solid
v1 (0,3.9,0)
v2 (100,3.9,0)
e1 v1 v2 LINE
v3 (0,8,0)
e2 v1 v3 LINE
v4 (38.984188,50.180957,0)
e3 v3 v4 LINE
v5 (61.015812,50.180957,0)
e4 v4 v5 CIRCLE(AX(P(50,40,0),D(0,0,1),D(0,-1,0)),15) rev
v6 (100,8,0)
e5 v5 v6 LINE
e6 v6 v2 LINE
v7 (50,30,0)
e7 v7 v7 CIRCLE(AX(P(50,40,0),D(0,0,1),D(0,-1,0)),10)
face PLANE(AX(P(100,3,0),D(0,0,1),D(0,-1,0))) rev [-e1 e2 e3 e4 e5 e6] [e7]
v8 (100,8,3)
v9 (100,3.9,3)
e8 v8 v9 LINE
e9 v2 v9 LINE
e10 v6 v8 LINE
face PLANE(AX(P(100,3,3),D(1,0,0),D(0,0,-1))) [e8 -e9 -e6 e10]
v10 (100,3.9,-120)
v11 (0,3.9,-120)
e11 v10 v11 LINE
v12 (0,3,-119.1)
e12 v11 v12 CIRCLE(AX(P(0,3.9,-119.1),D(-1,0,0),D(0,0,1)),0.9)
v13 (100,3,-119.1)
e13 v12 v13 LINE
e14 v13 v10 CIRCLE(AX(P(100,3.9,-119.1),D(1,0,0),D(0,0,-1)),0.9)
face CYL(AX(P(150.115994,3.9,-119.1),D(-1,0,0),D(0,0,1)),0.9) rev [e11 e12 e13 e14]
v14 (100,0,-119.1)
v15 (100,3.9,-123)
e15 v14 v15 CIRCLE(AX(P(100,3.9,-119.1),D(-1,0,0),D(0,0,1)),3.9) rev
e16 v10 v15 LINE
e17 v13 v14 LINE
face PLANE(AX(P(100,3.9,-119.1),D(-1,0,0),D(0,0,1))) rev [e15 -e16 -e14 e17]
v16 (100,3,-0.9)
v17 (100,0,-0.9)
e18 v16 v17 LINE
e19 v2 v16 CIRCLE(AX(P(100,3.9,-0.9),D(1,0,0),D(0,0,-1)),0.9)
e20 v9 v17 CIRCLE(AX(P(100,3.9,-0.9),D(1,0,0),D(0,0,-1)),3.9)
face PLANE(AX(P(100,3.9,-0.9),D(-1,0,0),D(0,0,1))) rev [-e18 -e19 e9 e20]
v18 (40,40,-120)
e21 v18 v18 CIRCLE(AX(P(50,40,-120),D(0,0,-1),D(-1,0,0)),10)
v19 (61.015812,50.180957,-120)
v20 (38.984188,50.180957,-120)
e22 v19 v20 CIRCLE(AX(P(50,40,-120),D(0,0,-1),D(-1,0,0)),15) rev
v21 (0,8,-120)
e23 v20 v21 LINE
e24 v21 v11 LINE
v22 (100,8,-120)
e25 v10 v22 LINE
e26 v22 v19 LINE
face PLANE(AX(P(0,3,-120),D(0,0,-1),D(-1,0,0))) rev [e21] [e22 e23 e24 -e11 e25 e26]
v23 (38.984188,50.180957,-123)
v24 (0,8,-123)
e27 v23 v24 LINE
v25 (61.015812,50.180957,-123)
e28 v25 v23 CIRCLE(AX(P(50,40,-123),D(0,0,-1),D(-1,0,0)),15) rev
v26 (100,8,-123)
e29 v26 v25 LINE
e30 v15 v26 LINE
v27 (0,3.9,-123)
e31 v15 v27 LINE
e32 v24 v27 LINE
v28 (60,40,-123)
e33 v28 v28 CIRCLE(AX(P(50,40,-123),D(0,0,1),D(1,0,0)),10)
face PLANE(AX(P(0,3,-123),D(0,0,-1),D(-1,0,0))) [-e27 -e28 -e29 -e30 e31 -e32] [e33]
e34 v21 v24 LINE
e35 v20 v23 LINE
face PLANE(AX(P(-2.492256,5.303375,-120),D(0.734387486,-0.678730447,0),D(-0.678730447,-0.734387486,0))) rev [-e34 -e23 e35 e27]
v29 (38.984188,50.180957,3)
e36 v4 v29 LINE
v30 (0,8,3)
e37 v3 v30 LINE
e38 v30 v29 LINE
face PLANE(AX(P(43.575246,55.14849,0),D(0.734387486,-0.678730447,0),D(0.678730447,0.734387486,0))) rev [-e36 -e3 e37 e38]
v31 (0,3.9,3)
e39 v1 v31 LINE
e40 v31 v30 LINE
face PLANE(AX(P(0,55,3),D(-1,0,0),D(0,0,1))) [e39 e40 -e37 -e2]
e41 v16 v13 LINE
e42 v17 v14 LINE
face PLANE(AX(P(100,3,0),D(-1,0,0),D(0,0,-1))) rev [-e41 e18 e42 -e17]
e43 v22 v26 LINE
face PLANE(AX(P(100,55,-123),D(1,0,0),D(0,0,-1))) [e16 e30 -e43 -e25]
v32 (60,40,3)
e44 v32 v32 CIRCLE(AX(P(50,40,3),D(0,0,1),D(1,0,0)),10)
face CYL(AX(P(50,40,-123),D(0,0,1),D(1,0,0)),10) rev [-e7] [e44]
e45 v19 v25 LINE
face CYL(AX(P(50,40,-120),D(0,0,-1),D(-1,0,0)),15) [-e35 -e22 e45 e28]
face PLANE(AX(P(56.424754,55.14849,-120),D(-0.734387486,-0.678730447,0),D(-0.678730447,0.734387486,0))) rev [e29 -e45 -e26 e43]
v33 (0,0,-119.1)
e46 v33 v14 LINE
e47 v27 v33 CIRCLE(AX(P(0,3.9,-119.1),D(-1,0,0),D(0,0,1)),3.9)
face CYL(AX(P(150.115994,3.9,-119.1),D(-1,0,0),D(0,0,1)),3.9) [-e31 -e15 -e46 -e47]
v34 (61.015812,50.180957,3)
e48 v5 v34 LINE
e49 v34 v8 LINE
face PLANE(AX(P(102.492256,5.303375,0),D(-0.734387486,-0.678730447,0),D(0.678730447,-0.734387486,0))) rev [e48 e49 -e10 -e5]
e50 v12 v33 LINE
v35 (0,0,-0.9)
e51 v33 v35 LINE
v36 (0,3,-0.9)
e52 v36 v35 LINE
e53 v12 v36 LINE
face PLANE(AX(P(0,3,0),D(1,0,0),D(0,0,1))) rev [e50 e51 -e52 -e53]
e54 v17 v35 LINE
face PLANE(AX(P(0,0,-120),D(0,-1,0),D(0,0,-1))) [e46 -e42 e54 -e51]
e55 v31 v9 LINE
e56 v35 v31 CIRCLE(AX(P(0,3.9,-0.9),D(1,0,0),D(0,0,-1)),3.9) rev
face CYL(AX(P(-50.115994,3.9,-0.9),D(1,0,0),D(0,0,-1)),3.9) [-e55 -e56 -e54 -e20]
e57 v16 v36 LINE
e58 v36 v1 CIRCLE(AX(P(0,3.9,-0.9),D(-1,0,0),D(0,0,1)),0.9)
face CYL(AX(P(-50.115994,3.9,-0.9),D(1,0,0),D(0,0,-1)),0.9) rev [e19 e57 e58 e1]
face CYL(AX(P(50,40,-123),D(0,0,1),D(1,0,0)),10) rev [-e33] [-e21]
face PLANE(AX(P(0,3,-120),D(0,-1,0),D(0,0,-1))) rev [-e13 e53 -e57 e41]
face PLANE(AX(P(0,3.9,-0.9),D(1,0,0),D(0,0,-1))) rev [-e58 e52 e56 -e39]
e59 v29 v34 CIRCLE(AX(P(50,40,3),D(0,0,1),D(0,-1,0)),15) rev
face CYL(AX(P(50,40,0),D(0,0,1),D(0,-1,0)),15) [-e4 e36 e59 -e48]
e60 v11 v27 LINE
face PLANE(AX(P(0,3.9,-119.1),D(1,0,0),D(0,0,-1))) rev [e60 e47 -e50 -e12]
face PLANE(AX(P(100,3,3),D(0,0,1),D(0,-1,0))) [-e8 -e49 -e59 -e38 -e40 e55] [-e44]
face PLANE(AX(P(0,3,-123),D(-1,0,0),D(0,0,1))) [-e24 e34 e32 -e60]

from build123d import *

# Parameters (mm, degrees)
ESBO_O1_W                      = 100
ESBO_O1_H                      = 120
RESSALTO_EXTRUS_O1_DEPTH       = 3
ARESTA_FLANGE1_STRIP_W         = 13.8
ARESTA_FLANGE1_STRIP_H         = 3
ARESTA_FLANGE1_STRIP_CUT_DEPTH = 100
ARESTA_FLANGE1_DEPTH           = 100
ARESTA_FLANGE2_STRIP_W         = 13.8
ARESTA_FLANGE2_STRIP_H         = 3
ARESTA_FLANGE2_STRIP_CUT_DEPTH = 100
ARESTA_FLANGE2_DEPTH           = 100
CORTE_EXTRUS_O1_DEPTH          = 171.002941151
ESBO_O13_R                     = 10
CORTE_EXTRUS_O2_DEPTH          = 171.002941151
DESDOBRAR1_START               = 3
DESDOBRAR1_OUTLINE_W           = 100
DESDOBRAR1_OUTLINE_H           = 126
DESDOBRAR1_DEPTH               = 53
DESDOBRAR1_2_OUTLINE_R         = 10
DESDOBRAR1_2_DEPTH             = 3
DOBRAR1_START                  = -175
DOBRAR1_OUTLINE_W              = 100
DOBRAR1_OUTLINE_H              = 3
DOBRAR1_DEPTH                  = 52
DOBRAR1_START_2                = 3
DOBRAR1_2_OUTLINE_W            = 100
DOBRAR1_2_OUTLINE_H            = 3
DOBRAR1_2_DEPTH                = 52
DOBRAR1_START_3                = -123
DOBRAR1_3_OUTLINE_R            = 10
DOBRAR1_3_DEPTH                = 3.9
DOBRAR1_START_4                = -0.9
DOBRAR1_4_OUTLINE_R            = 10
DOBRAR1_4_DEPTH                = 3.9
DOBRAR1_START_5                = -1
DOBRAR1_5_DEPTH                = 102


with BuildPart() as part:
    # Esboço1 → Ressalto-extrusão1 (new body)
    with BuildSketch(Plane(origin=(0, 0, 0), x_dir=(1, 0, 0), z_dir=(0, 1, 0))):
        with Locations((50, 60)):
            Rectangle(ESBO_O1_W, ESBO_O1_H)
    extrude(amount=RESSALTO_EXTRUS_O1_DEPTH)

    # Aresta-Flange1: sheet metal written as solids
    # Aresta-Flange1 strip (on a plane across the edge) → Aresta-Flange1 strip cut (cut)
    with BuildSketch(Plane(origin=(0, 3, 0), x_dir=(0, 0, -1), z_dir=(1, 0, 0))):
        with Locations((-6, -1.5)):
            Rectangle(ARESTA_FLANGE1_STRIP_W, ARESTA_FLANGE1_STRIP_H)
    extrude(amount=ARESTA_FLANGE1_STRIP_CUT_DEPTH, mode=Mode.SUBTRACT)

    # Aresta-Flange1 section (on a plane across the edge) → Aresta-Flange1 (add)
    with BuildSketch(Plane(origin=(0, 3, 0), x_dir=(0, 0, -1), z_dir=(1, 0, 0))):
        with BuildLine():
            Line((-3, 0.9), (-3, 52))
            Line((-3, 52), (0, 52))
            Line((0, 52), (0, 0.9))
            ThreePointArc((0, 0.9), (0.263603897, 0.263603897), (0.9, 0))
            Line((0.9, 0), (0.9, -3))
            ThreePointArc((0.9, -3), (-1.857716447, -1.857716447), (-3, 0.9))
        make_face()
    extrude(amount=ARESTA_FLANGE1_DEPTH)

    # Aresta-Flange2: sheet metal written as solids
    # Aresta-Flange2 strip (on a plane across the edge) → Aresta-Flange2 strip cut (cut)
    with BuildSketch(Plane(origin=(100, 3, -120), x_dir=(0, 0, 1), z_dir=(-1, 0, 0))):
        with Locations((-6, -1.5)):
            Rectangle(ARESTA_FLANGE2_STRIP_W, ARESTA_FLANGE2_STRIP_H)
    extrude(amount=ARESTA_FLANGE2_STRIP_CUT_DEPTH, mode=Mode.SUBTRACT)

    # Aresta-Flange2 section (on a plane across the edge) → Aresta-Flange2 (add)
    with BuildSketch(Plane(origin=(100, 3, -120), x_dir=(0, 0, 1), z_dir=(-1, 0, 0))):
        with BuildLine():
            Line((-3, 0.9), (-3, 52))
            Line((-3, 52), (0, 52))
            Line((0, 52), (0, 0.9))
            ThreePointArc((0, 0.9), (0.263603897, 0.263603897), (0.9, 0))
            Line((0.9, 0), (0.9, -3))
            ThreePointArc((0.9, -3), (-1.857716447, -1.857716447), (-3, 0.9))
        make_face()
    extrude(amount=ARESTA_FLANGE2_DEPTH)

    # Esboço11 → Corte-extrusão1 (cut, through all)
    with BuildSketch(Plane.XY.offset(3)):
        with BuildLine():
            Line((0, 55), (0, 8))
            Line((0, 8), (38.984187706, 50.180956709))
            ThreePointArc((38.984187706, 50.180956709), (43.988109725, 53.74253162), (50, 55))
            Line((50, 55), (0, 55))
        make_face()
        with BuildLine():
            Line((61.015812294, 50.180956709), (100, 8))
            Line((100, 8), (100, 55))
            Line((100, 55), (50, 55))
            ThreePointArc((50, 55), (56.011890275, 53.74253162), (61.015812294, 50.180956709))
        make_face()
    extrude(amount=-CORTE_EXTRUS_O1_DEPTH, mode=Mode.SUBTRACT)

    # Esboço13 → Corte-extrusão2 (cut, through all)
    with BuildSketch(Plane.XY.offset(3)):
        with Locations((50, 40)):
            Circle(ESBO_O13_R)
    extrude(amount=-CORTE_EXTRUS_O2_DEPTH, mode=Mode.SUBTRACT)

    # Desdobrar1: read off the stored shape, not the designer's step
    # Desdobrar1 outline → Desdobrar1 (cut)
    with BuildSketch(Plane(origin=(0, 0, 0), x_dir=(1, 0, 0), z_dir=(0, 1, 0)).offset(DESDOBRAR1_START)):
        with Locations((50, 60)):
            Rectangle(DESDOBRAR1_OUTLINE_W, DESDOBRAR1_OUTLINE_H)
    extrude(amount=DESDOBRAR1_DEPTH, mode=Mode.SUBTRACT)

    # Desdobrar1 2 outline → Desdobrar1 2 (add)
    with BuildSketch(Plane(origin=(0, 0, 0), x_dir=(1, 0, 0), z_dir=(0, 1, 0))):
        with BuildLine():
            Line((0, -6.969911184), (38.984187706, -49.150867893))
            ThreePointArc((38.984187706, -49.150867893), (50, -53.969911184), (61.015812294, -49.150867893))
            Line((61.015812294, -49.150867893), (100, -6.969911184))
            Line((100, -6.969911184), (100, 126.969911184))
            Line((100, 126.969911184), (61.015812294, 169.150867893))
            ThreePointArc((61.015812294, 169.150867893), (50, 173.969911184), (38.984187706, 169.150867893))
            Line((38.984187706, 169.150867893), (0, 126.969911184))
            Line((0, 126.969911184), (0, -6.969911184))
        make_face()
        with Locations((50, 158.969911184)):
            Circle(DESDOBRAR1_2_OUTLINE_R, mode=Mode.SUBTRACT)
        with Locations((50, -38.969911184)):
            Circle(DESDOBRAR1_2_OUTLINE_R, mode=Mode.SUBTRACT)
    extrude(amount=DESDOBRAR1_2_DEPTH)

    # Dobrar1: read off the stored shape, not the designer's step
    # Dobrar1 outline → Dobrar1 (cut)
    with BuildSketch(Plane.XY.offset(DOBRAR1_START)):
        with Locations((50, 1.5)):
            Rectangle(DOBRAR1_OUTLINE_W, DOBRAR1_OUTLINE_H)
    extrude(amount=DOBRAR1_DEPTH, mode=Mode.SUBTRACT)

    # Dobrar1 2 outline → Dobrar1 2 (cut)
    with BuildSketch(Plane.XY.offset(DOBRAR1_START_2)):
        with Locations((50, 1.5)):
            Rectangle(DOBRAR1_2_OUTLINE_W, DOBRAR1_2_OUTLINE_H)
    extrude(amount=DOBRAR1_2_DEPTH, mode=Mode.SUBTRACT)

    # Dobrar1 3 outline → Dobrar1 3 (add)
    with BuildSketch(Plane.XY.offset(DOBRAR1_START_3)):
        with BuildLine():
            Line((0, 8), (0, 3))
            Line((0, 3), (100, 3))
            Line((100, 3), (100, 8))
            Line((100, 8), (61.015812294, 50.180956709))
            ThreePointArc((61.015812294, 50.180956709), (50, 55), (38.984187706, 50.180956709))
            Line((38.984187706, 50.180956709), (0, 8))
        make_face()
        with Locations((50, 40)):
            Circle(DOBRAR1_3_OUTLINE_R, mode=Mode.SUBTRACT)
    extrude(amount=DOBRAR1_3_DEPTH)

    # Dobrar1 4 outline → Dobrar1 4 (add)
    with BuildSketch(Plane.XY.offset(DOBRAR1_START_4)):
        with BuildLine():
            Line((0, 8), (0, 3))
            Line((0, 3), (100, 3))
            Line((100, 3), (100, 8))
            Line((100, 8), (61.015812294, 50.180956709))
            ThreePointArc((61.015812294, 50.180956709), (50, 55), (38.984187706, 50.180956709))
            Line((38.984187706, 50.180956709), (0, 8))
        make_face()
        with Locations((50, 40)):
            Circle(DOBRAR1_4_OUTLINE_R, mode=Mode.SUBTRACT)
    extrude(amount=DOBRAR1_4_DEPTH)

    # Dobrar1 5 outline → Dobrar1 5 (cut)
    with BuildSketch(Plane.YZ.offset(DOBRAR1_START_5)):
        with BuildLine():
            Line((56, 0), (3.9, 0))
            ThreePointArc((3.9, 0), (3.263603897, -0.263603897), (3, -0.9))
            Line((3, -0.9), (56, -0.9))
            Line((56, -0.9), (56, 0))
        make_face()
        with BuildLine():
            Line((3.9, 3), (56, 2.999999983))
            Line((56, 2.999999983), (56, 5))
            Line((56, 5), (4e-08, 5))
            Line((4e-08, 5), (0, -0.9))
            ThreePointArc((0, -0.9), (1.142283553, 1.857716447), (3.9, 3))
        make_face()
        with BuildLine():
            Line((56, -120), (56, -119.1))
            Line((56, -119.1), (3, -119.1))
            ThreePointArc((3, -119.1), (3.263603897, -119.736396103), (3.9, -120))
            Line((3.9, -120), (56, -120))
        make_face()
        with BuildLine():
            Line((56, -124), (56, -122.999999983))
            Line((56, -122.999999983), (3.9, -123))
            ThreePointArc((3.9, -123), (1.142283553, -121.857716447), (0, -119.1))
            Line((0, -119.1), (4e-08, -124))
            Line((4e-08, -124), (56, -124))
        make_face()
    extrude(amount=DOBRAR1_5_DEPTH, mode=Mode.SUBTRACT)


solid = part.part
